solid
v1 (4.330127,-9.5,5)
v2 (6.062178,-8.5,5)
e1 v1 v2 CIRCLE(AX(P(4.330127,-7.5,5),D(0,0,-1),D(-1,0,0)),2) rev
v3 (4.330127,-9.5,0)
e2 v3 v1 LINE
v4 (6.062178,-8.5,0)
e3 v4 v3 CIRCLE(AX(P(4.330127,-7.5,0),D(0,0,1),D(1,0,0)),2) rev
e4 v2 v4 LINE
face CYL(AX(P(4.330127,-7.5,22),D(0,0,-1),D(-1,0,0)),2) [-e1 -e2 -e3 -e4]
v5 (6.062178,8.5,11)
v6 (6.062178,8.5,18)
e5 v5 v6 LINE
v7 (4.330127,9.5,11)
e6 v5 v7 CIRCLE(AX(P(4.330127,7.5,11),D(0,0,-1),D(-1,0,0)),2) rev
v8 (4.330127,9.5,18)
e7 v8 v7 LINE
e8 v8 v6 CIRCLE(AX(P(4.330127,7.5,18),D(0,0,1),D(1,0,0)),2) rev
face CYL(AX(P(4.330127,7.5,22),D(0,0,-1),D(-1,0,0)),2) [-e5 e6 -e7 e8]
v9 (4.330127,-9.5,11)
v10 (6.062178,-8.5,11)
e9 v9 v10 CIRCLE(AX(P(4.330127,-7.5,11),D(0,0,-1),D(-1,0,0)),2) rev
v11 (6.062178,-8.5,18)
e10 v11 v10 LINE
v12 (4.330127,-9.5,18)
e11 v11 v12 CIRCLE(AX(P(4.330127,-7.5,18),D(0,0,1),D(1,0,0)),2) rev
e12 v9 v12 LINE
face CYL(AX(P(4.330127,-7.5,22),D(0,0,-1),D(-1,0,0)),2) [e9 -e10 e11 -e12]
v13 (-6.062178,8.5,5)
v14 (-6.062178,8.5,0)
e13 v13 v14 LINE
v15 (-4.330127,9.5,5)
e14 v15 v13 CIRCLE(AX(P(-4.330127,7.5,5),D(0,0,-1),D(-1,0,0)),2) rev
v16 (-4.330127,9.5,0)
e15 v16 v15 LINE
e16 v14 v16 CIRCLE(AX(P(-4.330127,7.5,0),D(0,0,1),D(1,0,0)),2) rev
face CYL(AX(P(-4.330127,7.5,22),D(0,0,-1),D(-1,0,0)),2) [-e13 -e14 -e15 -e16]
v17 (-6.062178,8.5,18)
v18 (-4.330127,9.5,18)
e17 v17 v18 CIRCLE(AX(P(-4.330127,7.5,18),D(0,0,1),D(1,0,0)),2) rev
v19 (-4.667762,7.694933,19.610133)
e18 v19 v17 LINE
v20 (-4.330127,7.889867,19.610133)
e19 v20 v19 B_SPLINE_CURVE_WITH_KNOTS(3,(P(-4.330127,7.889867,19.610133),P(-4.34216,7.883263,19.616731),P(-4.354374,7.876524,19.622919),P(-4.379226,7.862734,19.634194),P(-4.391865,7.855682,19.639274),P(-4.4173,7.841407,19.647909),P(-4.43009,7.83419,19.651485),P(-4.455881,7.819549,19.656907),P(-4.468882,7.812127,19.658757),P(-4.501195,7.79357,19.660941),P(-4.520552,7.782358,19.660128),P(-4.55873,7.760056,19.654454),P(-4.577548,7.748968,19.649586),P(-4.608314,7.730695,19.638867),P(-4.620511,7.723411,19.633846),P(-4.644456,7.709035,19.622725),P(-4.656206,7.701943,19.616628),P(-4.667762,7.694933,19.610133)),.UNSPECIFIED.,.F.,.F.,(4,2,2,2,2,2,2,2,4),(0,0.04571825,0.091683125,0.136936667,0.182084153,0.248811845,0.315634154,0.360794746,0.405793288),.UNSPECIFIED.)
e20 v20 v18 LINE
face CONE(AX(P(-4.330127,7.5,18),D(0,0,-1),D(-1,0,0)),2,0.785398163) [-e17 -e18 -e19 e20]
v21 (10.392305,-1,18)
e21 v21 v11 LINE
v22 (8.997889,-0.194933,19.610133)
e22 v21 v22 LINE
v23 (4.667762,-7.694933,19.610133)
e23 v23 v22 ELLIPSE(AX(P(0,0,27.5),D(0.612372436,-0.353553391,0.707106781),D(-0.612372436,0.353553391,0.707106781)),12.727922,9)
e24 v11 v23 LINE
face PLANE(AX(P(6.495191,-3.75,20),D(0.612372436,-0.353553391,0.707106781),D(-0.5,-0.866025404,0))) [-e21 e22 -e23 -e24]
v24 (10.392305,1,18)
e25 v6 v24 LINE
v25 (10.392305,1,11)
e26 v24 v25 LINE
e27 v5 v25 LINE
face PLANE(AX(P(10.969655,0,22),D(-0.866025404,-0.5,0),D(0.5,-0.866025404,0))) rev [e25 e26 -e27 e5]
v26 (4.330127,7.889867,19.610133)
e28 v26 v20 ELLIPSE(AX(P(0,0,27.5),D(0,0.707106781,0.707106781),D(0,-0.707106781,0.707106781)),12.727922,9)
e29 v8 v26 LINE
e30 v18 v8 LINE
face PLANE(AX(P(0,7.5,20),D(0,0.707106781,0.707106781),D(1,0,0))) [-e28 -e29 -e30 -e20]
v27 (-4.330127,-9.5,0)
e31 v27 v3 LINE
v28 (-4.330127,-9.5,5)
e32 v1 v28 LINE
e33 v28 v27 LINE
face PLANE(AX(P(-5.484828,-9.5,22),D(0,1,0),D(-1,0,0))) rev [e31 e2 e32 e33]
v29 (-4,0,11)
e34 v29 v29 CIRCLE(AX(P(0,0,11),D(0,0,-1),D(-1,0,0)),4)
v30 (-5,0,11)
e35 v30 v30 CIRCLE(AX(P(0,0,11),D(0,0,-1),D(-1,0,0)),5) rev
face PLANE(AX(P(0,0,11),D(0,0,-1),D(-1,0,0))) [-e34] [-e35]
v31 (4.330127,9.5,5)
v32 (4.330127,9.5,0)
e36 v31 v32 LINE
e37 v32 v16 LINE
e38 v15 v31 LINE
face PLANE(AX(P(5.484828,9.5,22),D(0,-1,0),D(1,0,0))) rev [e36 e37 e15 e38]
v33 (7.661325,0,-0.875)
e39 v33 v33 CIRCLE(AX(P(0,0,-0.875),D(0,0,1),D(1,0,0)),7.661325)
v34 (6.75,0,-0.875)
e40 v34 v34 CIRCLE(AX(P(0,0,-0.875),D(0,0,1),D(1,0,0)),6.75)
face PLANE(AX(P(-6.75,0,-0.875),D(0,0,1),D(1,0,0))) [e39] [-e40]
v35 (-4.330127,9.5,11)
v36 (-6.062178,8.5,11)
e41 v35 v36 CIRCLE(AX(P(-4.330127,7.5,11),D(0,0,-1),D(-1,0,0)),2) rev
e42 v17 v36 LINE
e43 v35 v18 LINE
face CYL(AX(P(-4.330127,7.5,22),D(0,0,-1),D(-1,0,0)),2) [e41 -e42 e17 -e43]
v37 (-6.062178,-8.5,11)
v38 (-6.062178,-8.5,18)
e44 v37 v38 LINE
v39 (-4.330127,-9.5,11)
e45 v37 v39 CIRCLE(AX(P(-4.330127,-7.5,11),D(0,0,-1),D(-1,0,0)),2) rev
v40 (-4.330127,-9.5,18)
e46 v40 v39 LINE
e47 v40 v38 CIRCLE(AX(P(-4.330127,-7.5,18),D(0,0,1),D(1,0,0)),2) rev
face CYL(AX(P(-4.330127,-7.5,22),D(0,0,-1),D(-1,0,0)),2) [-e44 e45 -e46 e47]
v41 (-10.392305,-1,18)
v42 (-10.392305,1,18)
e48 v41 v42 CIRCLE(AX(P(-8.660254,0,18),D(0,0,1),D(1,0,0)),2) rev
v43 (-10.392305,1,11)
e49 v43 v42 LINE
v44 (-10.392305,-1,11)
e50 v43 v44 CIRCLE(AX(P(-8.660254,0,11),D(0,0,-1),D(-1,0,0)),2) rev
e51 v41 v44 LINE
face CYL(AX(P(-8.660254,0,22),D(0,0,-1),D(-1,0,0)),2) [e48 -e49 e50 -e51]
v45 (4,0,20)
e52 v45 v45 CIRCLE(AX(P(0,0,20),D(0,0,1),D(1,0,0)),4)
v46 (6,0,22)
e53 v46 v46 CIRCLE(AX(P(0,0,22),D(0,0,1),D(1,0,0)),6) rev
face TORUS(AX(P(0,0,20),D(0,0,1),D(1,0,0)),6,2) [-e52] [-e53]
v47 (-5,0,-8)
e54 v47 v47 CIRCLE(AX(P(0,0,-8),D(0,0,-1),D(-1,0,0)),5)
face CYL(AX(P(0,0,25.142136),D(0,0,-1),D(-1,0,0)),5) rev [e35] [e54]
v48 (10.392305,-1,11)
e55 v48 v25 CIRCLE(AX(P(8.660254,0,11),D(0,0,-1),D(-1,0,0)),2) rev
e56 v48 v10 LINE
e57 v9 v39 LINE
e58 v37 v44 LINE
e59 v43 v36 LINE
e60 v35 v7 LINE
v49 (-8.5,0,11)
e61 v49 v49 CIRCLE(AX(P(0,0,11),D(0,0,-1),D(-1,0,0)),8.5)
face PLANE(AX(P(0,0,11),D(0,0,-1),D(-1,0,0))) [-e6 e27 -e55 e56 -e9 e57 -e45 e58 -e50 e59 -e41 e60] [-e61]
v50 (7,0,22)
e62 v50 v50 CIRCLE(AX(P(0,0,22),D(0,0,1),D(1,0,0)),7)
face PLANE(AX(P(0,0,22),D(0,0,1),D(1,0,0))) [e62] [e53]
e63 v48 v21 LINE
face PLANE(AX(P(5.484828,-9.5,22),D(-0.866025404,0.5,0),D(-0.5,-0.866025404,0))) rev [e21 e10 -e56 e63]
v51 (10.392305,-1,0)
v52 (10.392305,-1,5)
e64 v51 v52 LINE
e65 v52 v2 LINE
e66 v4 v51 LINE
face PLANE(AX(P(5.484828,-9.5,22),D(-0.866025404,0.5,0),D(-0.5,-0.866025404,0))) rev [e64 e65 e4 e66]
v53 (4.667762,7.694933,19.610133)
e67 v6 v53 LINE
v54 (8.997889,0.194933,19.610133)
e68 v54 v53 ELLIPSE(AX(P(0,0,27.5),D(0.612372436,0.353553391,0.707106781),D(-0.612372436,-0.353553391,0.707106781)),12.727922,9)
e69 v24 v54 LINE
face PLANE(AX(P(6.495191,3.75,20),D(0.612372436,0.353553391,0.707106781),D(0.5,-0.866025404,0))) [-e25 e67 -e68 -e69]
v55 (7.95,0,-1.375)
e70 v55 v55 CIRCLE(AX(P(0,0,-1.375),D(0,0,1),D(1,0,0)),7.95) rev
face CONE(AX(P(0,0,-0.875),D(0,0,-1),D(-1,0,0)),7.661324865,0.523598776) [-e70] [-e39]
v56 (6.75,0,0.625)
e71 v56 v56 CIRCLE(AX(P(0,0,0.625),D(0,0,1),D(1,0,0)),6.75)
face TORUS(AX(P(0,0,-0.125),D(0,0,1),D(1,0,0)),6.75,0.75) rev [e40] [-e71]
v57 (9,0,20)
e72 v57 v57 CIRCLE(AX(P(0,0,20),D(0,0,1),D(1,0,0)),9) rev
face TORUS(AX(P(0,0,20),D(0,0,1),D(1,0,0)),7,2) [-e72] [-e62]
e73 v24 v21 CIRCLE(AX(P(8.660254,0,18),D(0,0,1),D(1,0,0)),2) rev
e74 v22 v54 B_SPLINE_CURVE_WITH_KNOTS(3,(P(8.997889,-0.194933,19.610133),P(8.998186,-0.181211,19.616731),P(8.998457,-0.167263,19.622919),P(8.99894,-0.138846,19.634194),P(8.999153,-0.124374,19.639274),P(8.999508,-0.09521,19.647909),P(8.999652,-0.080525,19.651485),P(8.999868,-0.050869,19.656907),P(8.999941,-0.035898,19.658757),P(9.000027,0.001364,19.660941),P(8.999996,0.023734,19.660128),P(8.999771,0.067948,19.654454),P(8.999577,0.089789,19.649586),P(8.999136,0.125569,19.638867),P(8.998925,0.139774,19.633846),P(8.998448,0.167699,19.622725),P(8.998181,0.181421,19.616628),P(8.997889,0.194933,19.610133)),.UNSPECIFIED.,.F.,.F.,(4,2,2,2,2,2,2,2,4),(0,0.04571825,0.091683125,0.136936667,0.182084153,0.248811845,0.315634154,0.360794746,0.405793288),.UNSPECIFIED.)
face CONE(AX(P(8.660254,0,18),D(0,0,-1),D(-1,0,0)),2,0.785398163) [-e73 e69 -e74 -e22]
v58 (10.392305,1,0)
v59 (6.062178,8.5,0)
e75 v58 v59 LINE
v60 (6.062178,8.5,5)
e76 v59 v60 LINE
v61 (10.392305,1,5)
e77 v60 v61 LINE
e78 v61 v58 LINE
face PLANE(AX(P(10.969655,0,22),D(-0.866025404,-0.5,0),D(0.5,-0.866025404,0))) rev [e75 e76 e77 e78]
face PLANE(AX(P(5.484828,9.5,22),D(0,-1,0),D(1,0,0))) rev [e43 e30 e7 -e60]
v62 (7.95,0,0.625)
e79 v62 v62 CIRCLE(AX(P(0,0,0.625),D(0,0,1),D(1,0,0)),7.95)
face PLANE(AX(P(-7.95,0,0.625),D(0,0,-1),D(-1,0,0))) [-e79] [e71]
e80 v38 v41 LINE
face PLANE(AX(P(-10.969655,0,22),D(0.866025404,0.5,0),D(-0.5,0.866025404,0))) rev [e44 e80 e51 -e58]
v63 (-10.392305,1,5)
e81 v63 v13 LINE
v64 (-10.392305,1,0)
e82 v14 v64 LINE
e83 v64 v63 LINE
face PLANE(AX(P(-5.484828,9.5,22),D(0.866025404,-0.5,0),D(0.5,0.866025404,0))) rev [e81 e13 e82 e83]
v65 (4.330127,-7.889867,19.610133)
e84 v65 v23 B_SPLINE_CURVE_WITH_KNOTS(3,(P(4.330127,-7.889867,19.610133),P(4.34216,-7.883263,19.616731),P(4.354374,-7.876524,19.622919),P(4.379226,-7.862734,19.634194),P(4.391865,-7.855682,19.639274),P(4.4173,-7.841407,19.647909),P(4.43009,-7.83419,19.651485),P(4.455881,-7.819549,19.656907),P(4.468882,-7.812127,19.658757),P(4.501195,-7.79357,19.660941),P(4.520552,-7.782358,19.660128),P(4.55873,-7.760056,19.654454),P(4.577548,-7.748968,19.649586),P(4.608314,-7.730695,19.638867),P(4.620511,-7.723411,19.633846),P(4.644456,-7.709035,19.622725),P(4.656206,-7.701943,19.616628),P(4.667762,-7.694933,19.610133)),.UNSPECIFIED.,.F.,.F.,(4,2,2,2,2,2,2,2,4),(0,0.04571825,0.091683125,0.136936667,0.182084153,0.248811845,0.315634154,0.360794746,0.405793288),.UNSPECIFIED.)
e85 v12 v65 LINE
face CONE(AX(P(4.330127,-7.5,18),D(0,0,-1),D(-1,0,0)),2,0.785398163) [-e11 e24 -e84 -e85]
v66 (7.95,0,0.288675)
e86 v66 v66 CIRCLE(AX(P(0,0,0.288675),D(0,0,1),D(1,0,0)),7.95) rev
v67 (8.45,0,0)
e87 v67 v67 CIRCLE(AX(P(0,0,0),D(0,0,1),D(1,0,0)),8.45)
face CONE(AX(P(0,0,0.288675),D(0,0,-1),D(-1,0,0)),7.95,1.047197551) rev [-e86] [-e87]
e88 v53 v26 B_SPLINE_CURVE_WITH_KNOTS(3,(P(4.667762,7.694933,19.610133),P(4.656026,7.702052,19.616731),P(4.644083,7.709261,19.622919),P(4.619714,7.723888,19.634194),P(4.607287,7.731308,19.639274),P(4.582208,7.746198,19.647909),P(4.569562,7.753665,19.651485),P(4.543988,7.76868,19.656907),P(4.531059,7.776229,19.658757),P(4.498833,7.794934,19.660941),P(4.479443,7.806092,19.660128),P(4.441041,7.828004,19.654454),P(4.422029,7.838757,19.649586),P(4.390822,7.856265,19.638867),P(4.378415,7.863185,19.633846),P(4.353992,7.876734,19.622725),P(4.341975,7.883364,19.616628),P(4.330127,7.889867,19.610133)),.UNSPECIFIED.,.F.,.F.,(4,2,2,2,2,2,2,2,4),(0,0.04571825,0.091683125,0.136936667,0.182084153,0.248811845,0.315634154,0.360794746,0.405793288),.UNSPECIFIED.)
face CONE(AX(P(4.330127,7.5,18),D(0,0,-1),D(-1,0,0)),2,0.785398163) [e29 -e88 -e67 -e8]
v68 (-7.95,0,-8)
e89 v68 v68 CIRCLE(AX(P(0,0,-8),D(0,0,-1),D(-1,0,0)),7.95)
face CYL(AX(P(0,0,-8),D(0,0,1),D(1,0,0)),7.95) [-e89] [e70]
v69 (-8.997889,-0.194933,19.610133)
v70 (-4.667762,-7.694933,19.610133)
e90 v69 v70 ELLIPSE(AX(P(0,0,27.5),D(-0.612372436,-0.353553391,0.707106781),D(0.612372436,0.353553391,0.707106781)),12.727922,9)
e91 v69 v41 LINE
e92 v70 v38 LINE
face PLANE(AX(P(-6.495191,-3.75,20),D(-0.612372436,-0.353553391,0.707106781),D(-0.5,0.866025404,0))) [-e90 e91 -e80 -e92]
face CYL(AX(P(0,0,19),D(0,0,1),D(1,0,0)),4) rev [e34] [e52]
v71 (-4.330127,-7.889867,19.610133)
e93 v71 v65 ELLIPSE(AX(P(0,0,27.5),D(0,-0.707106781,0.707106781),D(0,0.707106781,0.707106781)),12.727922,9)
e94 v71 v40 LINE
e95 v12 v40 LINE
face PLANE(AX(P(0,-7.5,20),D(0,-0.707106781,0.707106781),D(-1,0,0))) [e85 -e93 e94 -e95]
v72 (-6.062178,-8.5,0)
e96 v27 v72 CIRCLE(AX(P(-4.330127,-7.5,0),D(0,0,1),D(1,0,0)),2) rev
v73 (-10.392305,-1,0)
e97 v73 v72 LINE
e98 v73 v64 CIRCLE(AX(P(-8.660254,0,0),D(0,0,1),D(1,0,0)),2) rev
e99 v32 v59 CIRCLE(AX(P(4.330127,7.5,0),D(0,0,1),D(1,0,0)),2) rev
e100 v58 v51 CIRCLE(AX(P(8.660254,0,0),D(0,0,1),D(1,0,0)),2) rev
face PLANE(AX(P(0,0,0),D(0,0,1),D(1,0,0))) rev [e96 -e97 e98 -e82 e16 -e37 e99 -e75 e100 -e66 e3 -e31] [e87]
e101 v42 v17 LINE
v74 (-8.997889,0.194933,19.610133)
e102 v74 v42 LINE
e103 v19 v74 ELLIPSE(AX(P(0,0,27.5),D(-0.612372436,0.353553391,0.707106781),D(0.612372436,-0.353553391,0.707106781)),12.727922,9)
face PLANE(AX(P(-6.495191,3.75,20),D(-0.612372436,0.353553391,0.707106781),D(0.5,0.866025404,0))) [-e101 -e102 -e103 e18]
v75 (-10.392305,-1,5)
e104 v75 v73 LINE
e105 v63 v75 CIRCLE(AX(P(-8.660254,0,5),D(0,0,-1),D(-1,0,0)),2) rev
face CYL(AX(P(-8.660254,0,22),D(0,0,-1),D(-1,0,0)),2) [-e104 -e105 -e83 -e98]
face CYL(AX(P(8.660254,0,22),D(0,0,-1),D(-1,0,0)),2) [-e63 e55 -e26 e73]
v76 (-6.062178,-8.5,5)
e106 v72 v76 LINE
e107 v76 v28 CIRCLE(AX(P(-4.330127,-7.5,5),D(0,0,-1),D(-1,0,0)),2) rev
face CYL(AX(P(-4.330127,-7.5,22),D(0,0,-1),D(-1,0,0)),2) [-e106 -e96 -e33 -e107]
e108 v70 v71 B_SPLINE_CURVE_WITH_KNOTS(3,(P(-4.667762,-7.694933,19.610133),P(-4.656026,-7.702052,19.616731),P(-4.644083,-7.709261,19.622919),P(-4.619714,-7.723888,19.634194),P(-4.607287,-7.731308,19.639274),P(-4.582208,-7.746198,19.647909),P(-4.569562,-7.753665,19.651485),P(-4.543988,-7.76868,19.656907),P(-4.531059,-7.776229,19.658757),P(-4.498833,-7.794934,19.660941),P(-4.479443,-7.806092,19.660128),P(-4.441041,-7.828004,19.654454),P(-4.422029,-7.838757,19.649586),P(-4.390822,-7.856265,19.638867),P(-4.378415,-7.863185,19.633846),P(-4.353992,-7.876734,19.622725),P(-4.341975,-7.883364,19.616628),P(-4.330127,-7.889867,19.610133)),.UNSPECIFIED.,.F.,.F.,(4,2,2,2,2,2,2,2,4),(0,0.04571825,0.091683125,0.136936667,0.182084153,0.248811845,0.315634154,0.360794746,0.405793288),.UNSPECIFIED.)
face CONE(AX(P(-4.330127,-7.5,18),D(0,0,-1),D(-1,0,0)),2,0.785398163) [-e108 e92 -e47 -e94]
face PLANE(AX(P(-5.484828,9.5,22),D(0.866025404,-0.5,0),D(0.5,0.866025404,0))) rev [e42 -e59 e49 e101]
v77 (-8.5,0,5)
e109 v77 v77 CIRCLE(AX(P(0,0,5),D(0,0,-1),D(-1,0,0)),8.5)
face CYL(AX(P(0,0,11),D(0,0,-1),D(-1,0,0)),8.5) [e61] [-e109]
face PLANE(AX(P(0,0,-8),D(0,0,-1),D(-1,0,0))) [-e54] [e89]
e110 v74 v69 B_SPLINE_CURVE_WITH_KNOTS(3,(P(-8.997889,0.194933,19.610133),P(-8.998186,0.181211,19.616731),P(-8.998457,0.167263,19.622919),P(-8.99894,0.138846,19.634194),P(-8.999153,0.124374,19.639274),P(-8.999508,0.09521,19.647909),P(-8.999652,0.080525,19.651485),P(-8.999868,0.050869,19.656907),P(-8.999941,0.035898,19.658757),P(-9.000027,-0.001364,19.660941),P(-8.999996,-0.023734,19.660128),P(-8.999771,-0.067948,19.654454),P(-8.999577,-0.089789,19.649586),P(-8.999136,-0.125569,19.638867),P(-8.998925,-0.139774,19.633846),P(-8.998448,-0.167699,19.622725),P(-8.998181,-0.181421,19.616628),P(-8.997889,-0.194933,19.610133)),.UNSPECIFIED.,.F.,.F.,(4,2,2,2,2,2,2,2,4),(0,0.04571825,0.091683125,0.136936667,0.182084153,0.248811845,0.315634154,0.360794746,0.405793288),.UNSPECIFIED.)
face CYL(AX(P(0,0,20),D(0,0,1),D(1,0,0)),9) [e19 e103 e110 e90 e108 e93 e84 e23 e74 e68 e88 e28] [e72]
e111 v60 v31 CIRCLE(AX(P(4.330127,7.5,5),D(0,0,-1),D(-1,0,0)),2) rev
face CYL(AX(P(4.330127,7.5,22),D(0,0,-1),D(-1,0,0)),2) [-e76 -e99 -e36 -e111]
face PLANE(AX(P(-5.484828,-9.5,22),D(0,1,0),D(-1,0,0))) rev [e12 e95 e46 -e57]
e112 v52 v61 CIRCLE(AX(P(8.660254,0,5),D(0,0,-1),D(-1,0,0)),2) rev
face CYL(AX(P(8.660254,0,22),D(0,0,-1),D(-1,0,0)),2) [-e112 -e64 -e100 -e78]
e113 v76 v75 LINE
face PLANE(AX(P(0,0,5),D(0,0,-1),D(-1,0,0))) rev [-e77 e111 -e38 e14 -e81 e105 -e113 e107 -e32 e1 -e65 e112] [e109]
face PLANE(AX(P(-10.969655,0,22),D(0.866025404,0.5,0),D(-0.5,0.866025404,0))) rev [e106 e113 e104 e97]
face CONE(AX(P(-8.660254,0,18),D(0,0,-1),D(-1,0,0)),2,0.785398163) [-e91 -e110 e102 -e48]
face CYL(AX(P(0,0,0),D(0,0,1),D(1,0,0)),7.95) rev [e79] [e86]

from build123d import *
from OCP.BRepFilletAPI import BRepFilletAPI_MakeChamfer

# Parameters (mm, degrees)
BOSS_EXTRUDE1_DEPTH = 22
SKETCH2_R           = 7.95
BOSS_EXTRUDE2_DEPTH = 8
SKETCH3_OUTSIDE_W   = 32.288
SKETCH3_OUTSIDE_H   = 29.348
SKETCH3_OUTSIDE_R   = 9
CUT_EXTRUDE1_DEPTH  = 2
FILLET1_R           = 2
CHAMFER1_SIZE       = 2
FILLET2_R           = 2
CUT_EXTRUDE2_START  = -5
SKETCH4_OUTSIDE_W   = 31.604
SKETCH4_OUTSIDE_H   = 29.284
SKETCH4_OUTSIDE_R   = 8.5
CUT_EXTRUDE2_DEPTH  = 6
SKETCH5_R           = 4
CUT_EXTRUDE3_DEPTH  = 3
FILLET3_R           = 2
SKETCH6_R           = 5
CUT_EXTRUDE4_DEPTH  = 19
SKETCH7_R           = 0.7
CUT_EXTRUDE5_DEPTH  = 31.543264727
CHAMFER2_SIZE       = 0.5
CHAMFER2_SIZE2      = 0.288675135
SKETCH9_R           = 4
CUT_EXTRUDE6_DEPTH  = 31.543264727


with BuildPart() as part:
    # Sketch1 → Boss-Extrude1 (new body)
    with BuildSketch(Plane.XY):
        Polygon((10.969655115, 0), (5.484827557, 9.5), (-5.484827557, 9.5), (-10.969655115, 0), (-5.484827557, -9.5), (5.484827557, -9.5), align=None)
    extrude(amount=BOSS_EXTRUDE1_DEPTH)

    # Sketch2 → Boss-Extrude2 (add)
    with BuildSketch(Plane(origin=(0, 0, 0), x_dir=(-1, 0, 0), z_dir=(0, 0, -1))):
        Circle(SKETCH2_R)
    extrude(amount=BOSS_EXTRUDE2_DEPTH)

    # Sketch3 outside → Cut-Extrude1 (cut)
    with BuildSketch(Plane.XY.offset(22)):
        Rectangle(SKETCH3_OUTSIDE_W, SKETCH3_OUTSIDE_H)
        Circle(SKETCH3_OUTSIDE_R, mode=Mode.SUBTRACT)
    extrude(amount=-CUT_EXTRUDE1_DEPTH, mode=Mode.SUBTRACT)

    # Fillet1
    fillet1_edges = [part.edges().sort_by_distance(p)[0] for p in [
        (5.484827557, -9.5, 10),
        (-5.484827557, -9.5, 10),
        (-10.969655115, 0, 10),
        (-5.484827557, 9.5, 10),
        (5.484827557, 9.5, 10),
        (10.969655115, 0, 10),
    ]]
    fillet(fillet1_edges, radius=FILLET1_R)

    # Chamfer1
    # the kernel refuses this chamfer: 2 mm, written as the material it takes off along each edge
    with BuildSketch(Plane(origin=(-4.330127019, -9.5, 20), x_dir=(0, 1, 0), z_dir=(1, 0, 0))) as chamfer1_piece_1_section:
        Polygon((CHAMFER1_SIZE, 0), (0, -CHAMFER1_SIZE), (0, 0), align=None)
    chamfer1_piece_1 = extrude(amount=8.660254038, mode=Mode.PRIVATE)
    chamfer1_piece_1 = chamfer1_piece_1 - Plane(origin=(0, 0, 20), x_dir=(1, 0, 0), z_dir=(0, 0, 1)) * Cylinder(9, 26, mode=Mode.PRIVATE)
    add(chamfer1_piece_1, mode=Mode.SUBTRACT)
    with BuildSketch(Plane(origin=(4.330127019, -7.5, 20), x_dir=(0.8660254037844417, -0.49999999999999456, 0), z_dir=(0.49999999999999456, 0.8660254037844417, 0))) as chamfer1_piece_2_section:
        Polygon((2 - CHAMFER1_SIZE, 0), (2, CHAMFER1_SIZE), (2, 0), align=None)
    chamfer1_piece_2 = revolve(axis=Axis((4.330127019, -7.5, 20), (0, 0, -1)), revolution_arc=60, mode=Mode.PRIVATE)
    chamfer1_piece_2 = chamfer1_piece_2 - Plane(origin=(0, 0, 20), x_dir=(1, 0, 0), z_dir=(0, 0, 1)) * Cylinder(9, 8, mode=Mode.PRIVATE)
    add(chamfer1_piece_2, mode=Mode.SUBTRACT)
    with BuildSketch(Plane(origin=(-4.330127019, -7.5, 20), x_dir=(0, -1, 0), z_dir=(1, 0, 0))) as chamfer1_piece_3_section:
        Polygon((2 - CHAMFER1_SIZE, 0), (2, CHAMFER1_SIZE), (2, 0), align=None)
    chamfer1_piece_3 = revolve(axis=Axis((-4.330127019, -7.5, 20), (0, 0, -1)), revolution_arc=60, mode=Mode.PRIVATE)
    chamfer1_piece_3 = chamfer1_piece_3 - Plane(origin=(0, 0, 20), x_dir=(1, 0, 0), z_dir=(0, 0, 1)) * Cylinder(9, 8, mode=Mode.PRIVATE)
    add(chamfer1_piece_3, mode=Mode.SUBTRACT)
    with BuildSketch(Plane(origin=(6.062177826, -8.5, 20), x_dir=(-0.8660254037844416, 0.499999999999995, 0), z_dir=(0.499999999999995, 0.8660254037844416, 0))) as chamfer1_piece_4_section:
        Polygon((CHAMFER1_SIZE, 0), (0, -CHAMFER1_SIZE), (0, 0), align=None)
    chamfer1_piece_4 = extrude(amount=8.660254038, mode=Mode.PRIVATE)
    chamfer1_piece_4 = chamfer1_piece_4 - Plane(origin=(0, 0, 20), x_dir=(1, 0, 0), z_dir=(0, 0, 1)) * Cylinder(9, 26, mode=Mode.PRIVATE)
    add(chamfer1_piece_4, mode=Mode.SUBTRACT)
    with BuildSketch(Plane(origin=(-10.392304845, -1, 20), x_dir=(0.8660254037844345, 0.5000000000000072, 0), z_dir=(0.5000000000000072, -0.8660254037844346, 0))) as chamfer1_piece_5_section:
        Polygon((CHAMFER1_SIZE, 0), (0, -CHAMFER1_SIZE), (0, 0), align=None)
    chamfer1_piece_5 = extrude(amount=8.660254038, mode=Mode.PRIVATE)
    chamfer1_piece_5 = chamfer1_piece_5 - Plane(origin=(0, 0, 20), x_dir=(1, 0, 0), z_dir=(0, 0, 1)) * Cylinder(9, 26, mode=Mode.PRIVATE)
    add(chamfer1_piece_5, mode=Mode.SUBTRACT)
    with BuildSketch(Plane(origin=(8.660254038, 0, 20), x_dir=(0.866025403784438, 0.500000000000001, 0), z_dir=(-0.500000000000001, 0.866025403784438, 0))) as chamfer1_piece_6_section:
        Polygon((2, CHAMFER1_SIZE), (2 - CHAMFER1_SIZE, 0), (2, 0), align=None)
    chamfer1_piece_6 = revolve(axis=Axis((8.660254038, 0, 20), (0, 0, -1)), revolution_arc=60, mode=Mode.PRIVATE)
    chamfer1_piece_6 = chamfer1_piece_6 - Plane(origin=(0, 0, 20), x_dir=(1, 0, 0), z_dir=(0, 0, 1)) * Cylinder(9, 9, mode=Mode.PRIVATE)
    add(chamfer1_piece_6, mode=Mode.SUBTRACT)
    with BuildSketch(Plane(origin=(-8.660254038, 0, 20), x_dir=(-0.8660254037844414, 0.4999999999999952, 0), z_dir=(0.4999999999999952, 0.8660254037844414, 0))) as chamfer1_piece_7_section:
        Polygon((2 - CHAMFER1_SIZE, 0), (2, -CHAMFER1_SIZE), (2, 0), align=None)
    chamfer1_piece_7 = revolve(axis=Axis((-8.660254038, 0, 20), (0, 0, 1)), revolution_arc=60, mode=Mode.PRIVATE)
    chamfer1_piece_7 = chamfer1_piece_7 - Plane(origin=(0, 0, 20), x_dir=(1, 0, 0), z_dir=(0, 0, 1)) * Cylinder(9, 8, mode=Mode.PRIVATE)
    add(chamfer1_piece_7, mode=Mode.SUBTRACT)
    with BuildSketch(Plane(origin=(10.392304845, 1, 20), x_dir=(0, 0, -1), z_dir=(-0.500000000000001, 0.866025403784438, 0))) as chamfer1_piece_8_section:
        Polygon((CHAMFER1_SIZE, 0), (0, CHAMFER1_SIZE), (0, 0), align=None)
    chamfer1_piece_8 = extrude(amount=8.660254038, mode=Mode.PRIVATE)
    chamfer1_piece_8 = chamfer1_piece_8 - Plane(origin=(0, 0, 20), x_dir=(1, 0, 0), z_dir=(0, 0, 1)) * Cylinder(9, 26, mode=Mode.PRIVATE)
    add(chamfer1_piece_8, mode=Mode.SUBTRACT)
    with BuildSketch(Plane(origin=(-6.062177826, 8.5, 20), x_dir=(0.8660254037844415, -0.49999999999999517, 0), z_dir=(-0.49999999999999517, -0.8660254037844415, 0))) as chamfer1_piece_9_section:
        Polygon((CHAMFER1_SIZE, 0), (0, -CHAMFER1_SIZE), (0, 0), align=None)
    chamfer1_piece_9 = extrude(amount=8.660254038, mode=Mode.PRIVATE)
    chamfer1_piece_9 = chamfer1_piece_9 - Plane(origin=(0, 0, 20), x_dir=(1, 0, 0), z_dir=(0, 0, 1)) * Cylinder(9, 26, mode=Mode.PRIVATE)
    add(chamfer1_piece_9, mode=Mode.SUBTRACT)
    with BuildSketch(Plane(origin=(4.330127019, 7.5, 20), x_dir=(0.8660254037844379, 0.5000000000000013, 0), z_dir=(0.5000000000000013, -0.8660254037844379, 0))) as chamfer1_piece_10_section:
        Polygon((2, -CHAMFER1_SIZE), (2 - CHAMFER1_SIZE, 0), (2, 0), align=None)
    chamfer1_piece_10 = revolve(axis=Axis((4.330127019, 7.5, 20), (0, 0, 1)), revolution_arc=60, mode=Mode.PRIVATE)
    chamfer1_piece_10 = chamfer1_piece_10 - Plane(origin=(0, 0, 20), x_dir=(1, 0, 0), z_dir=(0, 0, 1)) * Cylinder(9, 9, mode=Mode.PRIVATE)
    add(chamfer1_piece_10, mode=Mode.SUBTRACT)
    with BuildSketch(Plane(origin=(-4.330127019, 7.5, 20), x_dir=(0, 1, 0), z_dir=(1, 0, 0))) as chamfer1_piece_11_section:
        Polygon((2 - CHAMFER1_SIZE, 0), (2, -CHAMFER1_SIZE), (2, 0), align=None)
    chamfer1_piece_11 = revolve(axis=Axis((-4.330127019, 7.5, 20), (0, 0, 1)), revolution_arc=60, mode=Mode.PRIVATE)
    chamfer1_piece_11 = chamfer1_piece_11 - Plane(origin=(0, 0, 20), x_dir=(1, 0, 0), z_dir=(0, 0, 1)) * Cylinder(9, 8, mode=Mode.PRIVATE)
    add(chamfer1_piece_11, mode=Mode.SUBTRACT)
    with BuildSketch(Plane(origin=(4.330127019, 9.5, 20), x_dir=(0, -1, 0), z_dir=(-1, 0, 0))) as chamfer1_piece_12_section:
        Polygon((CHAMFER1_SIZE, 0), (0, -CHAMFER1_SIZE), (0, 0), align=None)
    chamfer1_piece_12 = extrude(amount=8.660254038, mode=Mode.PRIVATE)
    chamfer1_piece_12 = chamfer1_piece_12 - Plane(origin=(0, 0, 20), x_dir=(1, 0, 0), z_dir=(0, 0, 1)) * Cylinder(9, 26, mode=Mode.PRIVATE)
    add(chamfer1_piece_12, mode=Mode.SUBTRACT)

    # Fillet2
    # the kernel refuses this fillet: 2 mm, written as the material it takes off along each edge
    with BuildSketch(Plane(origin=(0, 0, 22), x_dir=(1, 0, 0), z_dir=(0, -1, 0))) as fillet2_piece_1:
        with BuildLine():
            CenterArc((9 - FILLET2_R, -FILLET2_R), FILLET2_R, 0, 90)
            Line((9 - FILLET2_R, 0), (9, 0))
            Line((9, 0), (9, -FILLET2_R))
        make_face()
    revolve(axis=Axis((0, 0, 22), (0, 0, 1)), mode=Mode.SUBTRACT)

    # Sketch4 outside → Cut-Extrude2 (cut)
    with BuildSketch(Plane(origin=(0, 0, 0), x_dir=(-1, 0, 0), z_dir=(0, 0, -1)).offset(CUT_EXTRUDE2_START)):
        Rectangle(SKETCH4_OUTSIDE_W, SKETCH4_OUTSIDE_H)
        Circle(SKETCH4_OUTSIDE_R, mode=Mode.SUBTRACT)
    extrude(amount=-CUT_EXTRUDE2_DEPTH, mode=Mode.SUBTRACT)

    # Sketch5 → Cut-Extrude3 (cut)
    with BuildSketch(Plane.XY.offset(22)):
        Circle(SKETCH5_R)
    extrude(amount=-CUT_EXTRUDE3_DEPTH, mode=Mode.SUBTRACT)

    # Fillet3
    fillet3_edges = [part.edges().sort_by_distance(p)[0] for p in [
        (-4, 0, 22),
    ]]
    fillet(fillet3_edges, radius=FILLET3_R)

    # Sketch6 → Cut-Extrude4 (cut)
    with BuildSketch(Plane(origin=(0, 0, -8), x_dir=(-1, 0, 0), z_dir=(0, 0, -1))):
        Circle(SKETCH6_R)
    extrude(amount=-CUT_EXTRUDE4_DEPTH, mode=Mode.SUBTRACT)

    # Sketch7 → Cut-Extrude5 (cut, through all)
    with BuildSketch(Plane.XY.offset(19)):
        with Locations((-2.5, 0)):
            Circle(SKETCH7_R)
        with Locations((-1.25, 2.165063509)):
            Circle(SKETCH7_R)
        with Locations((1.25, 2.165063509)):
            Circle(SKETCH7_R)
        with Locations((2.5, 0)):
            Circle(SKETCH7_R)
        with Locations((1.25, -2.165063509)):
            Circle(SKETCH7_R)
        with Locations((-1.25, -2.165063509)):
            Circle(SKETCH7_R)
    extrude(amount=-CUT_EXTRUDE5_DEPTH, mode=Mode.SUBTRACT)

    # Sketch8 → Cut-Revolve1 (revolve, cut)
    with BuildSketch(Plane(origin=(0, 0, 0), x_dir=(1, 0, 0), z_dir=(0, 1, 0)), mode=Mode.PRIVATE) as cut_revolve1_sk:
        with BuildLine():
            Line((-6.75, 0.875), (-7.95, 0.875))
            Line((-7.95, 0.875), (-7.95, -0.625))
            Line((-7.95, -0.625), (-6.75, -0.625))
            ThreePointArc((-6.75, -0.625), (-6, 0.125), (-6.75, 0.875))
        make_face()
    revolve(cut_revolve1_sk.sketch.rotate(Axis((0, 0, 0), (0, 0, -1)), 180), axis=Axis((0, 0, 0), (0, 0, -1)), mode=Mode.SUBTRACT)

    # Chamfer2: one chamfer whose edges measure the first distance from different faces: ONE call of the kernel's chamfer builder (chamfer() names one face for all edges)
    chamfer2_edges_1 = [part.edges().sort_by_distance(p)[0] for p in [
        (-7.95, 0, 0),
    ]]
    chamfer2_side_1 = [part.faces().sort_by_distance(p)[0] for p in [
        (7.979921088, 4.607209589, 0),
    ]]
    chamfer2_edges_2 = [part.edges().sort_by_distance(p)[0] for p in [
        (7.95, 0, -0.875),
    ]]
    chamfer2_side_2 = [part.faces().sort_by_distance(p)[0] for p in [
        (7.95, 0, -4.4375),
    ]]
    chamfer2 = BRepFilletAPI_MakeChamfer(part.part.solid().wrapped)
    for e in chamfer2_edges_1:
        chamfer2.Add(CHAMFER2_SIZE, CHAMFER2_SIZE2, e.wrapped, chamfer2_side_1[0].wrapped)  # the first distance lies on this face
    for e in chamfer2_edges_2:
        chamfer2.Add(CHAMFER2_SIZE, CHAMFER2_SIZE2, e.wrapped, chamfer2_side_2[0].wrapped)  # the first distance lies on this face
    add(Compound.cast(chamfer2.Shape()), mode=Mode.REPLACE)

    # Sketch9 → Cut-Extrude6 (cut, through all)
    with BuildSketch(Plane.XY.offset(19)):
        Circle(SKETCH9_R)
    extrude(amount=-CUT_EXTRUDE6_DEPTH, mode=Mode.SUBTRACT)


solid = part.part
